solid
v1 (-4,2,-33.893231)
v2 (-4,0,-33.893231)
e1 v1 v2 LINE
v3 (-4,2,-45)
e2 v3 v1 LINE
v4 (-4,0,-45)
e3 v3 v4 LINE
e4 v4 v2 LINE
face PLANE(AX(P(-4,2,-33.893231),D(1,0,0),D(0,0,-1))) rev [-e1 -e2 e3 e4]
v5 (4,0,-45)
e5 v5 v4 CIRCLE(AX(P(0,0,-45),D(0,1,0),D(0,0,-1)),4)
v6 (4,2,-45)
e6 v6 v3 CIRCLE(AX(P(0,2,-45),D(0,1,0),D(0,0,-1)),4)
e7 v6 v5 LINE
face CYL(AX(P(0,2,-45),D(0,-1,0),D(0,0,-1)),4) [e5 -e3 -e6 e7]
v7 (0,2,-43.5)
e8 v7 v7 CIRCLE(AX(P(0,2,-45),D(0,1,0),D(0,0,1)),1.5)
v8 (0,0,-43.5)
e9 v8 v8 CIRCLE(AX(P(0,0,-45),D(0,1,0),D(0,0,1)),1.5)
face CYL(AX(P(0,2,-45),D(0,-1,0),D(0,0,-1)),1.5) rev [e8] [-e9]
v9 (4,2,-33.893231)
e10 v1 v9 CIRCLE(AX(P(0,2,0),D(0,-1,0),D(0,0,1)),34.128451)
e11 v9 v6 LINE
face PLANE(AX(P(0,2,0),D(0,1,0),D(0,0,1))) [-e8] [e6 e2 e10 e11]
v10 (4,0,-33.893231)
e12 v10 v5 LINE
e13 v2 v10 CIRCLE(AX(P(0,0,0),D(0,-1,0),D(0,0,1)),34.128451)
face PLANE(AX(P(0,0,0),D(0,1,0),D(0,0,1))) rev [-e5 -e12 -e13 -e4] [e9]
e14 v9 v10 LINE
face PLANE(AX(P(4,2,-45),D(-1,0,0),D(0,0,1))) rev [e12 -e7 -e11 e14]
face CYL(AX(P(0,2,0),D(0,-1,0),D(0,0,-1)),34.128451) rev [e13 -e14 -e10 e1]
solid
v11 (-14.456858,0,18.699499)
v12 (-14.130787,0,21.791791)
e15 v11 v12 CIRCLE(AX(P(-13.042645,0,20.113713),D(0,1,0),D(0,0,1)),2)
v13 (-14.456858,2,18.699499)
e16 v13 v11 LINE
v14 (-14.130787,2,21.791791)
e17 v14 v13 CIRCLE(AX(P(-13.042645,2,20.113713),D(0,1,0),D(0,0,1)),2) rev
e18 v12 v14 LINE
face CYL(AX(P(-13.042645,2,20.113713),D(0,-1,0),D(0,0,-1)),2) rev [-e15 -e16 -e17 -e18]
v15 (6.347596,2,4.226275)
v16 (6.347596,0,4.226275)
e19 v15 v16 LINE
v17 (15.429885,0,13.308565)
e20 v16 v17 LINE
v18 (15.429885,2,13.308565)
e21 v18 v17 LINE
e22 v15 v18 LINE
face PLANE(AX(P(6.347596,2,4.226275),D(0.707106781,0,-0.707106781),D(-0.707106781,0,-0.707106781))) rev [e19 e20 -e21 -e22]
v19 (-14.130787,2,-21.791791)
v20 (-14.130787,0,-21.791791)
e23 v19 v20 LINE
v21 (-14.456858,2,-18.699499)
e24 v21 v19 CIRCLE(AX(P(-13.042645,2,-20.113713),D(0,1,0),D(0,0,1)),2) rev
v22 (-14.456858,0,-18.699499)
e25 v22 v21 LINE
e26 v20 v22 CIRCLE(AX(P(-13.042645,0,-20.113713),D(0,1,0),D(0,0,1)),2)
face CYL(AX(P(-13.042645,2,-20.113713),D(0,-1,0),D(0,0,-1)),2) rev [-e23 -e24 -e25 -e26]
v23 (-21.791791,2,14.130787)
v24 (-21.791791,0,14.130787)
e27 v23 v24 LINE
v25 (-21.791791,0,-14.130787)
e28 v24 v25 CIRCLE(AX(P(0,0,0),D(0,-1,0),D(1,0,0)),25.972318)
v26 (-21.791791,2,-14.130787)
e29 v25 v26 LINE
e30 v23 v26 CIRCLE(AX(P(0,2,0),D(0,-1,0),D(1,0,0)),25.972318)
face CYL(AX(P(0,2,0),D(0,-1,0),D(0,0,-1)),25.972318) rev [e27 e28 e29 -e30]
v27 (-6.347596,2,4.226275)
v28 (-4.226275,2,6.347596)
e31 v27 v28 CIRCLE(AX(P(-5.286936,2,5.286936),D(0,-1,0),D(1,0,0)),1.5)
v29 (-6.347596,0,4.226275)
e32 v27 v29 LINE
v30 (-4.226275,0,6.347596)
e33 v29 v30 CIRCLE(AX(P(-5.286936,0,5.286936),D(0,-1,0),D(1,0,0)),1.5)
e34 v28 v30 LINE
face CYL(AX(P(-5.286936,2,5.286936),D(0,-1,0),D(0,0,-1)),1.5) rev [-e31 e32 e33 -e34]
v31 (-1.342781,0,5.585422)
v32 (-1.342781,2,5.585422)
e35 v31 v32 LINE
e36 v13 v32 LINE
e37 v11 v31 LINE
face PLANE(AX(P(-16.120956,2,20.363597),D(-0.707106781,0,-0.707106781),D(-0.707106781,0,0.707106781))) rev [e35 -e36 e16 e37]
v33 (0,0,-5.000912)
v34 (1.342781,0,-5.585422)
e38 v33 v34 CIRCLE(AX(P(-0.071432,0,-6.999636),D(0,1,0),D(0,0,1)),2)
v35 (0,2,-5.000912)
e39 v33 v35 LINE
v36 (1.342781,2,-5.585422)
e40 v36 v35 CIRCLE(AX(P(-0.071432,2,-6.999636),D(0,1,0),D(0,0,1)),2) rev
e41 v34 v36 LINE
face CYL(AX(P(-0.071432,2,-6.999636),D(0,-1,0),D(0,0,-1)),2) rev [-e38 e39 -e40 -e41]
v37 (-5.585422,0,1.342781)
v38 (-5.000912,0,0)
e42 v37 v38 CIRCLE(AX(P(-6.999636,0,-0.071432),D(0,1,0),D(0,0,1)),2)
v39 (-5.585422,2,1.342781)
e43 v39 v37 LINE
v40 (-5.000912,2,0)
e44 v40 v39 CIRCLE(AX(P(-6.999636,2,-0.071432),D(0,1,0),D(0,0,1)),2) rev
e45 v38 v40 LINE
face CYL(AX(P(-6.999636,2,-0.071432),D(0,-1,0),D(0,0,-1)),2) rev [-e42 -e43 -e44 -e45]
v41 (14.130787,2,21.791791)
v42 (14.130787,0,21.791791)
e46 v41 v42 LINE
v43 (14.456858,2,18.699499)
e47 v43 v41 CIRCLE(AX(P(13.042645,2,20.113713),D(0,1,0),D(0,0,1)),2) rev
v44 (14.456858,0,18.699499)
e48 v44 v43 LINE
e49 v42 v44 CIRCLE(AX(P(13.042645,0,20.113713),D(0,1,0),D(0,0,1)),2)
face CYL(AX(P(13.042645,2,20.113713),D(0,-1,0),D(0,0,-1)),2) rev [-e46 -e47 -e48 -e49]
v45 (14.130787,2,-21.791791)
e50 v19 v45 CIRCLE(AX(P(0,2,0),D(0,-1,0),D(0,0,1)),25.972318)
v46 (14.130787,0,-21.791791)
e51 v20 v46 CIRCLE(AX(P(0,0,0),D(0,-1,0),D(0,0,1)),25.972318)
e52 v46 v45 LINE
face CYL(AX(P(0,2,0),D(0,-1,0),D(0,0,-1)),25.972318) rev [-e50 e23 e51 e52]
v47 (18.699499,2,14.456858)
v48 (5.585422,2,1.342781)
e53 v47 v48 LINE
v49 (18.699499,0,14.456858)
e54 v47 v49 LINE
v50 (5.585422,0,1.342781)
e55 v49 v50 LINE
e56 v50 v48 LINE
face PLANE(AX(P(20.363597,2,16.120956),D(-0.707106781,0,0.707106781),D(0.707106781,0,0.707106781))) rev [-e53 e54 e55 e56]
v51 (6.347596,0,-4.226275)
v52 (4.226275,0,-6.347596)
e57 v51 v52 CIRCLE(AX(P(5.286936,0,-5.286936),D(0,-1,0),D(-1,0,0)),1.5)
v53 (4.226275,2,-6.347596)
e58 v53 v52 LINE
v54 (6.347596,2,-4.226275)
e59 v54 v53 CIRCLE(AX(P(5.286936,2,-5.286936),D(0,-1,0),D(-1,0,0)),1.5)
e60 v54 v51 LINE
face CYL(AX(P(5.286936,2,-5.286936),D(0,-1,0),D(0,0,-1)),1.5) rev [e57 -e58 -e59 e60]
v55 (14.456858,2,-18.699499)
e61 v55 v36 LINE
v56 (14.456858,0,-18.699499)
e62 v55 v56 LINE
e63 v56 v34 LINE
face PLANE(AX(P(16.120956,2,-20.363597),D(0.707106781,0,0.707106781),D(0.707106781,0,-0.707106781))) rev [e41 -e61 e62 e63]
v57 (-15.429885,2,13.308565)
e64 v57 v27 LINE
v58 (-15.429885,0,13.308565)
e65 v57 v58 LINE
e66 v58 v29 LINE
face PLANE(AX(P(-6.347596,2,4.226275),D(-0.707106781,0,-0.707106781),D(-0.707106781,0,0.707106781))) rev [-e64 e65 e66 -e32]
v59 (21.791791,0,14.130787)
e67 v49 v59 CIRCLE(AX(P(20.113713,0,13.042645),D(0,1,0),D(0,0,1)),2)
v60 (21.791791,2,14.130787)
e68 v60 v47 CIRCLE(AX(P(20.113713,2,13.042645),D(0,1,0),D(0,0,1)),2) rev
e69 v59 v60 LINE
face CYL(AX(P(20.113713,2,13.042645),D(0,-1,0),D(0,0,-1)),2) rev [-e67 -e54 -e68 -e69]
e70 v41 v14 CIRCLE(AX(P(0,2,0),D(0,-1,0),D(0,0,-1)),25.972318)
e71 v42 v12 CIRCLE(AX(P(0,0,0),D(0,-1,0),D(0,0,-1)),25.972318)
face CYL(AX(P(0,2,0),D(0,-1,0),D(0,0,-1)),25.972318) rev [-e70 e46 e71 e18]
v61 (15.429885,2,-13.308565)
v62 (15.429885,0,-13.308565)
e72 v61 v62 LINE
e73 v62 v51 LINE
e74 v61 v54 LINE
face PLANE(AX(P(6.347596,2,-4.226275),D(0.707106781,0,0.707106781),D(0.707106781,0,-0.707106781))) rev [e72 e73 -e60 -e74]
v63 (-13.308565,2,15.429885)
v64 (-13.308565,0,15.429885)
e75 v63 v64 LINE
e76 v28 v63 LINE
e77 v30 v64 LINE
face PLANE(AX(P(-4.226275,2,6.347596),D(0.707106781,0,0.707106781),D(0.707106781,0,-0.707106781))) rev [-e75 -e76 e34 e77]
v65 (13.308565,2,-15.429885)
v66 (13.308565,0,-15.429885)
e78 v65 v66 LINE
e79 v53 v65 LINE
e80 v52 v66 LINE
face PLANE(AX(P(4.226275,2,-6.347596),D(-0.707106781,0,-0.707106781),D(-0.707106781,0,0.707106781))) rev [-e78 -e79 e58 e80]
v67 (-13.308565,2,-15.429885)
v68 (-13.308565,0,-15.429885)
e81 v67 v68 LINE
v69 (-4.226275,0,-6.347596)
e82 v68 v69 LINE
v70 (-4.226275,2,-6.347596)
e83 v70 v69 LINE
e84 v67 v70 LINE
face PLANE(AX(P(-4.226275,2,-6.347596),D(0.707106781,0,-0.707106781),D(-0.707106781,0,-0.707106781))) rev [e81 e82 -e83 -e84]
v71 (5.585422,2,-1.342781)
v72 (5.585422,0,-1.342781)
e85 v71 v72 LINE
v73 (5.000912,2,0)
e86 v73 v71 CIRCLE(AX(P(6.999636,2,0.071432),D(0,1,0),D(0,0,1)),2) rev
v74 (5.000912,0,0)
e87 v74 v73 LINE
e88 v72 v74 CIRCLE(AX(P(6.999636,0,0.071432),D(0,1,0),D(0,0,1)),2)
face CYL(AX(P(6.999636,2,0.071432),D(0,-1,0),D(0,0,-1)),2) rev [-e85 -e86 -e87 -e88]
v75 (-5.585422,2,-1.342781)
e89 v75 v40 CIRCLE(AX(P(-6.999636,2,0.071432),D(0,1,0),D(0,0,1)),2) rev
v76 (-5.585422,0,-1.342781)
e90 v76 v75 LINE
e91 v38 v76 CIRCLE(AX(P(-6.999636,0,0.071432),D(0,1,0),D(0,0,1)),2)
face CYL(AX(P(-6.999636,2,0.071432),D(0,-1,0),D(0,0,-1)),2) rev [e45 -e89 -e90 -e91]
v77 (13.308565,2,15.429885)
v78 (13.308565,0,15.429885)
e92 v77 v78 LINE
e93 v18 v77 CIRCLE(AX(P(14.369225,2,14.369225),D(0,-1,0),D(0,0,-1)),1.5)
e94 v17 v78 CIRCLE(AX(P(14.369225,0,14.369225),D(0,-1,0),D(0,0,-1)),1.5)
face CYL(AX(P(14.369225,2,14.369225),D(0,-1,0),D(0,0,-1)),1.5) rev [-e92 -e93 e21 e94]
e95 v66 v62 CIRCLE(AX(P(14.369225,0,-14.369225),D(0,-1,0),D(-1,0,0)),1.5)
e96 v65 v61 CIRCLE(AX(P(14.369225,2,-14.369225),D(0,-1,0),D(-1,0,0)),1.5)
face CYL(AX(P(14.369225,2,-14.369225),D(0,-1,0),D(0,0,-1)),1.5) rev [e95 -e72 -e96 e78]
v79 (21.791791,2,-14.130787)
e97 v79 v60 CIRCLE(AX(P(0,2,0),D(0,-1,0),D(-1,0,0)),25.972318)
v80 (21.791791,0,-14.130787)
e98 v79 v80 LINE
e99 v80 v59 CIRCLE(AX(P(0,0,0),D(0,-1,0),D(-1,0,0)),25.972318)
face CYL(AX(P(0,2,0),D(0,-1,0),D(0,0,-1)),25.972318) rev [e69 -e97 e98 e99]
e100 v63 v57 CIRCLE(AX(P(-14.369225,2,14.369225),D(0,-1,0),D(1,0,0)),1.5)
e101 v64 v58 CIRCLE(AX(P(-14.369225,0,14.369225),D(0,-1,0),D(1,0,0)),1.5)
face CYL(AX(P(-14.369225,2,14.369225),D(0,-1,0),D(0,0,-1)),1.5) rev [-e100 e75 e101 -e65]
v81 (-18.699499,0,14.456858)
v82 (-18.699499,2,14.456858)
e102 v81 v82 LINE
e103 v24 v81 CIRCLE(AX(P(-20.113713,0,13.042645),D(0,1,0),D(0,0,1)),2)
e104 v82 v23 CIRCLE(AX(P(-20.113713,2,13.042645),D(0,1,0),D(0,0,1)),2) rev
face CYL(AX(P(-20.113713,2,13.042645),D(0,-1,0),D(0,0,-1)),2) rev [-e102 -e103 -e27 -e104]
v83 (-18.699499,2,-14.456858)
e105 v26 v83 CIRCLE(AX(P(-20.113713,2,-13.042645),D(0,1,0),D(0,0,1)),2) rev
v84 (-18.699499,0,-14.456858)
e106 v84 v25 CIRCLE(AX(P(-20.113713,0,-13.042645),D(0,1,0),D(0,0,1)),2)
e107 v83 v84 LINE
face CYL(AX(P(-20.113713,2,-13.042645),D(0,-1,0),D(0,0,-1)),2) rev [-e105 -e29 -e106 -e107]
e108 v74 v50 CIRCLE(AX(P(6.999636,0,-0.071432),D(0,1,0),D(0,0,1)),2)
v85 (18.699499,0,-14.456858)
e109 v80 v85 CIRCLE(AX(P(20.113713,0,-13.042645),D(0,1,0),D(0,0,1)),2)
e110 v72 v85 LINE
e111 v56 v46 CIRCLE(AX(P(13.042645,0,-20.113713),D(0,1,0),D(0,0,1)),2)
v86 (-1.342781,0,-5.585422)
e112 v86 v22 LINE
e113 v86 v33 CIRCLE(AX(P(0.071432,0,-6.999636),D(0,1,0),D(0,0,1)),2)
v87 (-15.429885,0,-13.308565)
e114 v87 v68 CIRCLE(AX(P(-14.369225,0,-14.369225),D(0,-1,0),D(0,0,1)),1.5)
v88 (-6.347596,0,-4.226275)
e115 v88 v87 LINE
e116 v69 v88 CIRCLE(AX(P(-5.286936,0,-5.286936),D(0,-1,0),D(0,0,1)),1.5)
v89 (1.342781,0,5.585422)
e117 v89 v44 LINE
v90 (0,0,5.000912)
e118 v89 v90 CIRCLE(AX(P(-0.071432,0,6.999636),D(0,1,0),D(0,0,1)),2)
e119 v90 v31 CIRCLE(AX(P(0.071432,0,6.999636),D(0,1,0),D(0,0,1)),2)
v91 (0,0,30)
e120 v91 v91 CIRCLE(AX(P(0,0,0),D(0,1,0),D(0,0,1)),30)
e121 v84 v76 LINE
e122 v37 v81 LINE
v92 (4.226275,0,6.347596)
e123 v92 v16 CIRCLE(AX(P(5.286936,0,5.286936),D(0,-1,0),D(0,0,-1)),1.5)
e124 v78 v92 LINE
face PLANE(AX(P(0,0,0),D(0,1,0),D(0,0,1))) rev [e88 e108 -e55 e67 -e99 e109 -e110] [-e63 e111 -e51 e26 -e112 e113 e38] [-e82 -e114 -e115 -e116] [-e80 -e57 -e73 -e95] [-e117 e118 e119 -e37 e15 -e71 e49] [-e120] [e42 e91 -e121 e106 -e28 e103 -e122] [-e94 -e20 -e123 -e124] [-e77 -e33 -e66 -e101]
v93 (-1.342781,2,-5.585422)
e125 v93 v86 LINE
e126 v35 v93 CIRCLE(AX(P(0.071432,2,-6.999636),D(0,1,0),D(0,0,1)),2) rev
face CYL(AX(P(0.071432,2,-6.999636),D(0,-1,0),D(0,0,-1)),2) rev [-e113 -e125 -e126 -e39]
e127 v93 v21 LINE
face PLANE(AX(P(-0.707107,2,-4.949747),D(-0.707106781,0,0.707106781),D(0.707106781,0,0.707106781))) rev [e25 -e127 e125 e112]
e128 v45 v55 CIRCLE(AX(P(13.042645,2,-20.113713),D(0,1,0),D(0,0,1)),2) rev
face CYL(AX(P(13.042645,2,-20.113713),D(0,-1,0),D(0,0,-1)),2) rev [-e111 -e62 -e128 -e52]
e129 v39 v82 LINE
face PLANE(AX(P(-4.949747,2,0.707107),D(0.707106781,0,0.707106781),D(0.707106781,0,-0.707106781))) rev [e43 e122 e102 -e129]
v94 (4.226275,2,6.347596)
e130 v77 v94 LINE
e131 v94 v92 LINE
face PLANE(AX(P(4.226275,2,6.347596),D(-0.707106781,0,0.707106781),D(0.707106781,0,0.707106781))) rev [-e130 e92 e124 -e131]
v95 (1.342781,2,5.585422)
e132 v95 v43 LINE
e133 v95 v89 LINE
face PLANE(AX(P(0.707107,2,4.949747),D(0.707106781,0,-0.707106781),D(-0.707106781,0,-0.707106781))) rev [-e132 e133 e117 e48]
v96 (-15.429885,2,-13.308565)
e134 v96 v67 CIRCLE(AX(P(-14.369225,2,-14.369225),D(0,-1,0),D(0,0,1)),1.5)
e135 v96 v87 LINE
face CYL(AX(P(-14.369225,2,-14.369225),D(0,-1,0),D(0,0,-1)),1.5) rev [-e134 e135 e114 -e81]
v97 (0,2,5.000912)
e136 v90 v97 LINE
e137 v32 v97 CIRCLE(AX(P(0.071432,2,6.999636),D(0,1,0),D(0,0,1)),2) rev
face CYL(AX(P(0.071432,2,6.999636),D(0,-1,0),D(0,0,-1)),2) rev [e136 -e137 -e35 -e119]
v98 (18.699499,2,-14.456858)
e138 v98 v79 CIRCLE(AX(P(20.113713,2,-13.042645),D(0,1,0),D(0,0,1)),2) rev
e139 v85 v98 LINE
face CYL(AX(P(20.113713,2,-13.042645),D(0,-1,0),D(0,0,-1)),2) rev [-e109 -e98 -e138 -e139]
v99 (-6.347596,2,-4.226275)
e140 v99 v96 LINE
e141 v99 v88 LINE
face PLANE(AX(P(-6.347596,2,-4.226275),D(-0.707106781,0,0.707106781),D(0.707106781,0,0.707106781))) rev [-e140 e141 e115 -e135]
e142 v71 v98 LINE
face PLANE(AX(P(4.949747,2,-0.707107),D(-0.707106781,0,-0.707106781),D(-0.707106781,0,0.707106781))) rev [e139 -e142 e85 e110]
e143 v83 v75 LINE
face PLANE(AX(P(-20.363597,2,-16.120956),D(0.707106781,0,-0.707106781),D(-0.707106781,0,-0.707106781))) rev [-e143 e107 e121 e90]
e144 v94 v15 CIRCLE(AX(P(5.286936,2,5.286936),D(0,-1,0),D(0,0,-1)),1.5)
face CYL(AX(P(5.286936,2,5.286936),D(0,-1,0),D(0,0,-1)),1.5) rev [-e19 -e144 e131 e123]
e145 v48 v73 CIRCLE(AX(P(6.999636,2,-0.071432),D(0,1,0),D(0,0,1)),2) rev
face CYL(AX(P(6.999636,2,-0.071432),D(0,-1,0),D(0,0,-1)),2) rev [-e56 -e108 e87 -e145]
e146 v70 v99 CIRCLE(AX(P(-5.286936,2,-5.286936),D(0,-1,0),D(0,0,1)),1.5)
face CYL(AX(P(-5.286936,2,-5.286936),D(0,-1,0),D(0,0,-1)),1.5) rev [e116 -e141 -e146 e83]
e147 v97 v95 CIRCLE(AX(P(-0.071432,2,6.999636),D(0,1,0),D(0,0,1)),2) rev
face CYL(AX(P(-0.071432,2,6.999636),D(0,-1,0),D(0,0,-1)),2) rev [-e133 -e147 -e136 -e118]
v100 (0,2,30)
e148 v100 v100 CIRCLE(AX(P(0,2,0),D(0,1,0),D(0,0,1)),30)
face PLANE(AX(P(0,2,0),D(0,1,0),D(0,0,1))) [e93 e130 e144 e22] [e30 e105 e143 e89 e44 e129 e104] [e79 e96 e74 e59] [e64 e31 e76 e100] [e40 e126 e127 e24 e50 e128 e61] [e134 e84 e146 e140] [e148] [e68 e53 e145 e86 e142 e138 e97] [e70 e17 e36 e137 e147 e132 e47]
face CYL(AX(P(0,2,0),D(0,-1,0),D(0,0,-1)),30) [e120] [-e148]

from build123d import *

# Parameters (mm, degrees)
SKETCH1_R                = 29.999999999999996
BOSS_EXTRUDE1_DEPTH      = 2
SKETCH2_R                = 1.5000000000000024
BOSS_EXTRUDE2_DEPTH      = 2
CUT_EXTRUDE1_DEPTH       = 2
FILLET1_R                = 2
CIRPATTERN3_COUNT        = 4
FILLET1_OF_CIRPATTERN3_R = 2


with BuildPart() as part:
    # Sketch1 → Boss-Extrude1 (new body)
    with BuildSketch(Plane(origin=(0, 0, 0), x_dir=(1, 0, 0), z_dir=(0, 1, 0))):
        with Locations(Location((0, 0, 0), (0, 0, 270))):
            Circle(SKETCH1_R)
    extrude(amount=BOSS_EXTRUDE1_DEPTH)

    # Sketch3 → Cut-Extrude1 (cut)
    with BuildSketch(Plane.XZ):
        with BuildLine():
            Line((-16.120955993884955, 20.363596681004037), (-0.707106781186571, 4.949747468305829))
            ThreePointArc((-0.707106781186571, 4.949747468305829), (-1.635e-14, 5), (0.7071067811865381, 4.9497474683058345))
            Line((0.7071067811865381, 4.9497474683058345), (16.1209559938848, 20.363596681004154))
            ThreePointArc((16.1209559938848, 20.363596681004154), (-1.0222e-13, 25.9723178007542), (-16.120955993884955, 20.363596681004037))
        make_face()
        with BuildLine():
            Line((4.226275356880876, 6.347595700440537), (13.308564754978745, 15.429885098538437))
            ThreePointArc((13.308564754978745, 15.429885098538437), (15.429885098538385, 15.42988509853844), (15.429885098538387, 13.3085647549788))
            Line((15.429885098538387, 13.3085647549788), (6.347595700440546, 4.226275356880927))
            ThreePointArc((6.347595700440546, 4.226275356880927), (4.226275356880893, 4.226275356880883), (4.226275356880876, 6.347595700440537))
        make_face()
    cut_extrude1 = extrude(amount=-CUT_EXTRUDE1_DEPTH, mode=Mode.SUBTRACT)

    # Fillet1
    # the kernel refuses this fillet: 2 mm, written as the material it adds along each edge
    with BuildSketch(Plane(origin=(16.1209559938848, 0, 20.363596681004154), x_dir=(-0.8124484694054139, 0, 0.5830330046925304), z_dir=(0, 1, 0))) as fillet1_piece_1:
        with BuildLine():
            CenterArc((2.355278550114305, -1.9977749052453315), FILLET1_R, 87.29705530283536, 102.03879267807281)
            Line((0.38176972340459264, -2.322217366860414), (0, 0))
            ThreePointArc((0, 0), (1.2247970633110545, 0.02889543405250306), (2.4495941266221117, -1e-17))
        make_face()
    extrude(amount=2)
    with BuildSketch(Plane(origin=(-16.120955993884955, 0, 20.36359668100404), x_dir=(0.8124484694054097, 0, 0.5830330046925363), z_dir=(0, 1, 0))) as fillet1_piece_2:
        with BuildLine():
            CenterArc((2.3552785501143045, 1.9977749052453322), FILLET1_R, 170.66415201909183, 102.03879267807281)
            Line((0.38176972340459064, 2.3222173668604142), (0, 0))
            ThreePointArc((0, 0), (1.224797063311054, -0.02889543405249918), (2.4495941266221117, 4e-17))
        make_face()
    extrude(amount=2)
    with BuildSketch(Plane(origin=(-0.707106781186571, 0, 4.94974746830583), x_dir=(0.9978329265871119, 0, 0.06579856091587097), z_dir=(0, 1, 0))) as fillet1_piece_3:
        with BuildLine():
            CenterArc((0.9117316045667684, -1.9942190443130732), FILLET1_R, 94.35739687847523, 44.41530859723521)
            Line((-0.592470470427697, -0.6761234037837734), (0, 0))
            ThreePointArc((0, 0), (0.3798881685694877, -0.01445238921731624), (0.7597763371389753, 0))
        make_face()
    extrude(amount=2)
    with BuildSketch(Plane(origin=(0.7071067811865382, 0, 4.949747468305835), x_dir=(0.7071067811865465, 0, 0.7071067811865486), z_dir=(0, 1, 0))) as fillet1_piece_4:
        with BuildLine():
            CenterArc((0.8989794855684893, -2), FILLET1_R, 89.99999999999997, 44.41530859720547)
            ThreePointArc((-0.5007289388793513, -0.5714285714288758), (-0.23949481251558302, -0.2952391013252418), (0, 0))
            Line((0, 0), (0.8989794855684903, 2e-17))
        make_face()
    extrude(amount=2)

    # CirPattern3: Cut-Extrude1 ×4 about axis
    cirpattern3_axis = Axis((-1.408e-14, 0, 2.84e-15), (0, 1, 0))
    for i in range(1, CIRPATTERN3_COUNT):
        add(cut_extrude1.rotate(cirpattern3_axis, i * 360 / CIRPATTERN3_COUNT), mode=Mode.SUBTRACT)

    # Fillet1 of CirPattern3
    # the kernel refuses this fillet: 2 mm, written as the material it adds along each edge
    with BuildSketch(Plane(origin=(20.36359668100414, 0, -16.120955993884806), x_dir=(0.5830330046925314, 0, 0.8124484694054133), z_dir=(0, 1, 0))) as fillet1_of_cirpattern3_piece_1:
        with BuildLine():
            CenterArc((2.3552785501143045, -1.9977749052453315), FILLET1_OF_CIRPATTERN3_R, 87.29705530283529, 102.03879267807281)
            Line((0.3817697234045918, -2.3222173668604116), (0, 0))
            ThreePointArc((0, 0), (1.2247970633110554, 0.02889543405249672), (2.449594126622114, 4e-17))
        make_face()
    extrude(amount=2)
    with BuildSketch(Plane(origin=(20.36359668100402, 0, 16.120955993884948), x_dir=(-0.7071067811865438, 0, -0.7071067811865513), z_dir=(0, 1, 0))) as fillet1_of_cirpattern3_piece_2:
        with BuildLine():
            CenterArc((2.353389389934555, -2), FILLET1_OF_CIRPATTERN3_R, 89.99999999999997, 102.03879267807287)
            ThreePointArc((0.3973761741995627, -2.4171478153725032), (0.17017539002267335, -1.2132613605629643), (0, 0))
            Line((0, 0), (2.3533893899345557, 5e-17))
        make_face()
    extrude(amount=2)
    with BuildSketch(Plane(origin=(4.949747468305813, 0, 0.7071067811865603), x_dir=(0.7071067811865409, 0, 0.707106781186554), z_dir=(0, 1, 0))) as fillet1_of_cirpattern3_piece_3:
        with BuildLine():
            CenterArc((0.8989794855684675, 1.9999999999999998), FILLET1_OF_CIRPATTERN3_R, 225.58469140279482, 44.41530859720535)
            ThreePointArc((-0.5007289388793674, 0.571428571428869), (-0.23949481251558677, 0.29523910132524234), (0, 0))
            Line((0, 0), (0.8989794855684747, 1e-17))
        make_face()
    extrude(amount=2)
    with BuildSketch(Plane(origin=(4.9497474683058185, 0, -0.7071067811865489), x_dir=(0.06579856091586167, 0, 0.9978329265871125), z_dir=(0, 1, 0))) as fillet1_of_cirpattern3_piece_4:
        with BuildLine():
            CenterArc((0.9117316045667834, 1.9942190443130732), FILLET1_OF_CIRPATTERN3_R, 221.2272945242899, 44.4153085972348)
            Line((-0.5924704704276744, 0.6761234037837643), (0, 0))
            ThreePointArc((0, 0), (0.3798881685694939, 0.0144523892173167), (0.7597763371389883, 0))
        make_face()
    extrude(amount=2)
    with BuildSketch(Plane(origin=(-16.120955993884824, 0, -20.36359668100415), x_dir=(0.8124484694054139, 0, -0.5830330046925304), z_dir=(0, 1, 0))) as fillet1_of_cirpattern3_piece_5:
        with BuildLine():
            CenterArc((2.3552785501143063, -1.9977749052453326), FILLET1_OF_CIRPATTERN3_R, 87.2970553028354, 102.03879267807275)
            Line((0.38176972340459264, -2.322217366860414), (0, 0))
            ThreePointArc((0, 0), (1.2247970633110539, 0.02889543405249918), (2.4495941266221117, -1e-17))
        make_face()
    extrude(amount=2)
    with BuildSketch(Plane(origin=(16.12095599388493, 0, -20.36359668100403), x_dir=(-0.7071067811865509, 0, 0.7071067811865441), z_dir=(0, 1, 0))) as fillet1_of_cirpattern3_piece_6:
        with BuildLine():
            CenterArc((2.3533893899345526, -2), FILLET1_OF_CIRPATTERN3_R, 89.99999999999996, 102.03879267807292)
            ThreePointArc((0.39737617419956145, -2.4171478153725032), (0.17017539002267143, -1.2132613605629632), (0, 0))
            Line((0, 0), (2.353389389934554, -1.2e-16))
        make_face()
    extrude(amount=2)
    with BuildSketch(Plane(origin=(0.7071067811865434, 0, -4.949747468305825), x_dir=(0.7071067811865541, 0, -0.7071067811865409), z_dir=(0, 1, 0))) as fillet1_of_cirpattern3_piece_7:
        with BuildLine():
            CenterArc((0.8989794855684662, 1.9999999999999998), FILLET1_OF_CIRPATTERN3_R, 225.58469140279482, 44.41530859720535)
            ThreePointArc((-0.5007289388793689, 0.5714285714288692), (-0.23949481251558713, 0.2952391013252426), (0, 0))
            Line((0, 0), (0.8989794855684736, -1e-17))
        make_face()
    extrude(amount=2)
    with BuildSketch(Plane(origin=(-0.7071067811865659, 0, -4.94974746830583), x_dir=(0.9978329265871123, 0, -0.06579856091586292), z_dir=(0, 1, 0))) as fillet1_of_cirpattern3_piece_8:
        with BuildLine():
            CenterArc((0.911731604566765, 1.9942190443130734), FILLET1_OF_CIRPATTERN3_R, 221.22729452428956, 44.41530859723525)
            Line((-0.5924704704277004, 0.6761234037837739), (0, 0))
            ThreePointArc((0, 0), (0.37988816856948704, 0.01445238921731667), (0.7597763371389734, 1e-17))
        make_face()
    extrude(amount=2)
    with BuildSketch(Plane(origin=(-20.363596681004168, 0, 16.120955993884813), x_dir=(0.7071067811865483, 0, -0.7071067811865468), z_dir=(0, 1, 0))) as fillet1_of_cirpattern3_piece_9:
        with BuildLine():
            CenterArc((2.353389389934557, 2), FILLET1_OF_CIRPATTERN3_R, 167.96120732192713, 102.03879267807281)
            ThreePointArc((0.3973761741995647, 2.4171478153725037), (0.17017539002267684, 1.2132613605629667), (0, 0))
            Line((0, 0), (2.3533893899345557, -1e-17))
        make_face()
    extrude(amount=2)
    with BuildSketch(Plane(origin=(-20.363596681004047, 0, -16.12095599388494), x_dir=(0.7071067811865438, 0, 0.7071067811865513), z_dir=(0, 1, 0))) as fillet1_of_cirpattern3_piece_10:
        with BuildLine():
            CenterArc((2.353389389934555, -2), FILLET1_OF_CIRPATTERN3_R, 89.99999999999997, 102.03879267807287)
            ThreePointArc((0.3973761741995627, -2.4171478153725032), (0.17017539002267457, -1.2132613605629707), (0, 0))
            Line((0, 0), (2.3533893899345557, 5e-17))
        make_face()
    extrude(amount=2)
    with BuildSketch(Plane(origin=(-4.949747468305842, 0, -0.7071067811865552), x_dir=(-0.7071067811865421, 0, -0.707106781186553), z_dir=(0, 1, 0))) as fillet1_of_cirpattern3_piece_11:
        with BuildLine():
            CenterArc((0.898979485568472, 2), FILLET1_OF_CIRPATTERN3_R, 225.58469140279476, 44.41530859720535)
            ThreePointArc((-0.5007289388793642, 0.5714285714288699), (-0.23949481251558577, 0.29523910132524217), (0, 0))
            Line((0, 0), (0.898979485568476, 0))
        make_face()
    extrude(amount=2)
    with BuildSketch(Plane(origin=(-4.949747468305847, 0, 0.707106781186554), x_dir=(-0.06579856091586256, 0, -0.9978329265871123), z_dir=(0, 1, 0))) as fillet1_of_cirpattern3_piece_12:
        with BuildLine():
            CenterArc((0.9117316045667706, 1.994219044313073), FILLET1_OF_CIRPATTERN3_R, 221.22729452428956, 44.41530859723525)
            Line((-0.5924704704276954, 0.6761234037837742), (0, 0))
            ThreePointArc((0, 0), (0.3798881685694889, 0.01445238921731668), (0.7597763371389777, 0))
        make_face()
    extrude(amount=2)


with BuildPart() as body_2:
    # Sketch2 → Boss-Extrude2 (new body)
    with BuildSketch(Plane(origin=(0, 0, 0), x_dir=(1, 0, 0), z_dir=(0, 1, 0))):
        with BuildLine():
            Line((-4, 33.89323148929319), (-3.999999999999999, 45))
            ThreePointArc((-3.999999999999999, 45), (2.4e-16, 49), (4, 45))
            Line((4, 45), (4, 33.89323148929319))
            ThreePointArc((4, 33.89323148929319), (2.09e-15, 34.128450606302295), (-4, 33.89323148929319))
        make_face()
        with Locations(Location((0, 45, 0), (0, 0, 270))):
            Circle(SKETCH2_R, mode=Mode.SUBTRACT)
    extrude(amount=BOSS_EXTRUDE2_DEPTH)


solid = Compound([part.part, body_2.part])
